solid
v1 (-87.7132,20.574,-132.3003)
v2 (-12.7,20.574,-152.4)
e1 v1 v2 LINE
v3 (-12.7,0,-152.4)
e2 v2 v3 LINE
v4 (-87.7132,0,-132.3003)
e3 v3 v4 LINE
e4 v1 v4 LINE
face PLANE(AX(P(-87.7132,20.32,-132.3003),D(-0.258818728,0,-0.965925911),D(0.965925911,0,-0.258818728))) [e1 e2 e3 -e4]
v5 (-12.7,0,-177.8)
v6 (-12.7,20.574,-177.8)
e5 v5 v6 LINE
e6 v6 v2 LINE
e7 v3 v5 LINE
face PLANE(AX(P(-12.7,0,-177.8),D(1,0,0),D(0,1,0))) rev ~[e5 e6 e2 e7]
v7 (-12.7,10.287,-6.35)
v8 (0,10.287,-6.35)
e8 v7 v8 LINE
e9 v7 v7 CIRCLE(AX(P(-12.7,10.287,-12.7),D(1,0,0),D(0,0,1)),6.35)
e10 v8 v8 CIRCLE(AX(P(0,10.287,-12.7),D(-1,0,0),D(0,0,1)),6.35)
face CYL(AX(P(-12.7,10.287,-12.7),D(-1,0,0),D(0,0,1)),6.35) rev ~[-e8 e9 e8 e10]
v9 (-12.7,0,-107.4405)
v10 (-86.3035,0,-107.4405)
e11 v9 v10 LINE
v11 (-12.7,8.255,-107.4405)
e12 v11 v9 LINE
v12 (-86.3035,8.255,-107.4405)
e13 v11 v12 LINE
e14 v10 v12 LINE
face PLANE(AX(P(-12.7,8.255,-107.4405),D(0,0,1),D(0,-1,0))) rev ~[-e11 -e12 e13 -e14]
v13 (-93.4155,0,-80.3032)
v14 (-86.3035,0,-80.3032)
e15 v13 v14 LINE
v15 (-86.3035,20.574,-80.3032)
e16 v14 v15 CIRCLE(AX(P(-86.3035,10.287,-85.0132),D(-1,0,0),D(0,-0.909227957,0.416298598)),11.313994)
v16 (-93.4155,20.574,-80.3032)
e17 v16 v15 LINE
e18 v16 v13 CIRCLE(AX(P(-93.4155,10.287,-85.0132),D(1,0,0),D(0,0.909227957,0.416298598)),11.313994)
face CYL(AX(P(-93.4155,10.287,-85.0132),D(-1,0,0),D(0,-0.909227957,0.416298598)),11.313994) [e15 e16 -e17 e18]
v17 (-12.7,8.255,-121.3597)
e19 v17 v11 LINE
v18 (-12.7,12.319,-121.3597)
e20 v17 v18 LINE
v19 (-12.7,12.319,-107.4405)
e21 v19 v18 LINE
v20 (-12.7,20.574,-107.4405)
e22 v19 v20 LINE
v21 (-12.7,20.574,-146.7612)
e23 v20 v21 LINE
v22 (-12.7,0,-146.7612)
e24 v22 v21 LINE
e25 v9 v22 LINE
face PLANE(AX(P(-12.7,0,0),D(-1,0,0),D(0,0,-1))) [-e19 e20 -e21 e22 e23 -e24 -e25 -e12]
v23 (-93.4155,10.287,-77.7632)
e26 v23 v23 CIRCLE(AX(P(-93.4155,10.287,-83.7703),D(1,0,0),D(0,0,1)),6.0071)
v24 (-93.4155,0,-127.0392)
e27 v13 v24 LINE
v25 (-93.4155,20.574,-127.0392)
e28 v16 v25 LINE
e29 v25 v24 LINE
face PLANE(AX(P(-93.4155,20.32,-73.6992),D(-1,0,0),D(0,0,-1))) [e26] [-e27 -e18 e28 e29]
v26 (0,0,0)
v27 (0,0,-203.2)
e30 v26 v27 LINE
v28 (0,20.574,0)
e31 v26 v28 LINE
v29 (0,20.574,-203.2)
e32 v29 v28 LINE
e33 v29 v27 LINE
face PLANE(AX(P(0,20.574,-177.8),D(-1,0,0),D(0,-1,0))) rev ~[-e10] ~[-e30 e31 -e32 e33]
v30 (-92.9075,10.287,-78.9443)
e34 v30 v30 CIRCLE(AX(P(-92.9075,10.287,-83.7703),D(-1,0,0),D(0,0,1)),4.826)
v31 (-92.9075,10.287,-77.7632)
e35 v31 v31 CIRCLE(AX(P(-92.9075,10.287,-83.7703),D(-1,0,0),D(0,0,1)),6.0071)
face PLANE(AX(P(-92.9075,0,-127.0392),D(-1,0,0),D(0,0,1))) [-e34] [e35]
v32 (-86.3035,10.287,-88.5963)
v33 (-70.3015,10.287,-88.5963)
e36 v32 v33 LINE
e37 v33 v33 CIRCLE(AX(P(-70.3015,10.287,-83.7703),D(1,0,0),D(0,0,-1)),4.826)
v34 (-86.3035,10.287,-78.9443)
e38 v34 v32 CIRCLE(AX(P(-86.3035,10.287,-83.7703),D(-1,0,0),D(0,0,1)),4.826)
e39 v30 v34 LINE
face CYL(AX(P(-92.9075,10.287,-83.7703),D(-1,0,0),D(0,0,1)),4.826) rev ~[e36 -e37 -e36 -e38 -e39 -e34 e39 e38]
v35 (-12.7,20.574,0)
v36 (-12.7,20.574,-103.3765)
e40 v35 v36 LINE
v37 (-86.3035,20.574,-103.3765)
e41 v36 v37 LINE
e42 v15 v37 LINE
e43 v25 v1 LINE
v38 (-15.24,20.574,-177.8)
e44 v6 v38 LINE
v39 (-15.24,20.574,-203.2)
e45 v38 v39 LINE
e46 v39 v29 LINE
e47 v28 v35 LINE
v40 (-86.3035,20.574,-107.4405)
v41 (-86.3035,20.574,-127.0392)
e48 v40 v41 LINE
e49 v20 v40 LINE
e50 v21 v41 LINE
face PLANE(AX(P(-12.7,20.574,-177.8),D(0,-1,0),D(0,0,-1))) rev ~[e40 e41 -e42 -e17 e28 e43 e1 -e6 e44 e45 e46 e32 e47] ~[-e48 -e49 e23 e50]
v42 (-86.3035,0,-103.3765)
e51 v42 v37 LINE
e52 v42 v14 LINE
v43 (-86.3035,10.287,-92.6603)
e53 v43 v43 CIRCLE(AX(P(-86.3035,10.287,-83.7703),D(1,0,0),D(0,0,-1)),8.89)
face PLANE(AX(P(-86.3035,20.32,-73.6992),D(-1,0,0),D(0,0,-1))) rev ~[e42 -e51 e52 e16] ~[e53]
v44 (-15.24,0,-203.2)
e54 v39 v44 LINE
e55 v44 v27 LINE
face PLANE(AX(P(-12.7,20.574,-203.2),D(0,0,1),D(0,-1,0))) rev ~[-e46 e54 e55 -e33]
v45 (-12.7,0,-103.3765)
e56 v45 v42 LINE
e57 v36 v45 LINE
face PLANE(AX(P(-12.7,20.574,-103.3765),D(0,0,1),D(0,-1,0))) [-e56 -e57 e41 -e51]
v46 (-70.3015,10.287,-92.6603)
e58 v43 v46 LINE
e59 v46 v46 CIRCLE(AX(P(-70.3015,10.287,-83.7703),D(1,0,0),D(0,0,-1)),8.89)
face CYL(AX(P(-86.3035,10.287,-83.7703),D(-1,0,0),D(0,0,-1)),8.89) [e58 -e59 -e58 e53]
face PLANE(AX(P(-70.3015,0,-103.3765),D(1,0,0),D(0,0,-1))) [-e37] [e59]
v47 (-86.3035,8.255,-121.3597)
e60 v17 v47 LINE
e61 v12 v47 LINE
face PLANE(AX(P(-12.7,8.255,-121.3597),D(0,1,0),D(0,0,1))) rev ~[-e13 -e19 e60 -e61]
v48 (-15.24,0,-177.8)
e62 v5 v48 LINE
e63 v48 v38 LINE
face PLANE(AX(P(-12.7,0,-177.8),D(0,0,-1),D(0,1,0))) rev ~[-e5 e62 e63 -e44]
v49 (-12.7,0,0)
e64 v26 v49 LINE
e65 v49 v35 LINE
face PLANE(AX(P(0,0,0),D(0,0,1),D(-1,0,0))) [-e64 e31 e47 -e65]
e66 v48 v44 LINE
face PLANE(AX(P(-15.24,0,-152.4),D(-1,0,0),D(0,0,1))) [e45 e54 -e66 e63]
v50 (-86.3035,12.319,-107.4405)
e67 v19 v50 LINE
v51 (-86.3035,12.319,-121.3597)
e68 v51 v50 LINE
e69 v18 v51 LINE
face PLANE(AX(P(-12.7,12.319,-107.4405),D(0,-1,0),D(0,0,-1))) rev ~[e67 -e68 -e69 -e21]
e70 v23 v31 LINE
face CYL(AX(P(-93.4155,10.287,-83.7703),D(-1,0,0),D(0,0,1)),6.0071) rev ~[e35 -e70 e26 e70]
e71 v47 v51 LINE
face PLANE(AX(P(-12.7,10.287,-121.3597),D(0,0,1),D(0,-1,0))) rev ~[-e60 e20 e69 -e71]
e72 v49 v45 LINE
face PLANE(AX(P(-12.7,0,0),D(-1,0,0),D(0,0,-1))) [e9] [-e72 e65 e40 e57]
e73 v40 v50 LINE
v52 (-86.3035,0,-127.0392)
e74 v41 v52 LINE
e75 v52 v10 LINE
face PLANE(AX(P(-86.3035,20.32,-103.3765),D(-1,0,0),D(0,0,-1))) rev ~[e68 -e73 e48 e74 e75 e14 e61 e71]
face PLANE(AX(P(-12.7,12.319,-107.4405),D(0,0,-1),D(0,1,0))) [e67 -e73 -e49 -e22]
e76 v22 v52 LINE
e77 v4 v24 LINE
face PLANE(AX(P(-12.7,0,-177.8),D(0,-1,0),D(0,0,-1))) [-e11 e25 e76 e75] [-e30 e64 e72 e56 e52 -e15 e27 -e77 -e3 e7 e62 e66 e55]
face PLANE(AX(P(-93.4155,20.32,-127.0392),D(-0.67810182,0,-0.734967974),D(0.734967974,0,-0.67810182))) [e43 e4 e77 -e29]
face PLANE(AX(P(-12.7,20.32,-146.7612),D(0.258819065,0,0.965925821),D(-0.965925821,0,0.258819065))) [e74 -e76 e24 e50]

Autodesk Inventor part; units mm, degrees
ref_plane "YZ Plane" through (0, 0, 0) normal (1, 0, 0) x (0, 1, 0)
ref_plane "XZ Plane" through (0, 0, 0) normal (0, 1, 0) x (-1, 0, 0)
ref_plane "XY Plane" through (0, 0, 0) normal (0, 0, 1) x (1, 0, 0)
sketch "Sketch1" plane through (0, 0, 0) normal (0, 1, 0) x (-1, 0, 0)
  line L0 (0, 0) -> (12.7, 0)
  line L1 (12.7, 0) -> (12.7, -177.8)
  line L2 (12.7, -177.8) -> (0, -177.8)
  line L3 (0, -177.8) -> (0, 0)
  dimension "d0" = 12.7
  dimension "d1" = 177.8
extrude "Extrusion1" add sketch "Sketch1" along normal blind 20.574
sketch "Sketch4" plane through (0, 0, 0) normal (0, -1, 0) x (1, 0, 0)
  line L0 (0, -177.8) -> (-12.7, -177.8) projected
  line L1 (-12.7, -177.8) -> (0, -177.8)
  line L2 (0, -177.8) -> (0, -146.7612)
  line L3 (0, -146.7612) -> (-12.7, -146.7612)
  line L4 (-12.7, -146.7612) -> (-12.7, -177.8)
  line L5 (-12.7, -146.7612) -> (-86.3035, -127.0392)
  line L6 (-12.7, -146.7612) -> (63.5, -146.7612) construction
  line L7 (-86.3035, -127.0392) -> (-86.3035, -73.6992)
  line L8 (-86.3035, -73.6992) -> (-93.4155, -73.6992)
  line L9 (-93.4155, -73.6992) -> (-93.4155, -127.0392)
  line L10 (-12.7, -177.8) -> (0, -177.8)
  line L11 (0, -177.8) -> (0, -152.4)
  line L12 (0, -152.4) -> (-12.7, -152.4)
  line L13 (-12.7, -152.4) -> (-12.7, -177.8)
  line L14 (-12.7, -152.4) -> (-87.7132, -132.3003)
  line L15 (-87.7132, -132.3003) -> (-93.4155, -127.0392)
  point P0 (0, 0)
  dimension "d6" = 12.7
  dimension "d7" = 31.0388
  dimension "d8" = 76.2
  dimension "d9" = 165
  dimension "d10" = 53.34
  dimension "d11" = 7.112
  dimension "d12" = 12.7
  dimension "d13" = 25.4
sketch "Sketch5" plane through (-12.7, 0, -177.8) normal (-1, 0, 0) x (0, 0, 1)
  line L0 (177.8, 20.574) -> (0, 20.574) projected
  line L1 (0, 0) -> (177.8, 0) projected
  line L2 (0, 20.574) -> (31.0403, 20.574)
  line L3 (31.0403, 20.574) -> (31.0403, 0)
  line L4 (31.0403, 0) -> (0, 0)
  line L5 (0, 0) -> (0, 20.574)
  line L6 (31.0403, 10.287) -> (56.4403, 10.287)
  line L7 (56.4403, 10.287) -> (56.4403, 12.319)
  line L8 (56.4403, 12.319) -> (56.4403, 8.255)
  line L9 (56.4403, 8.255) -> (70.3595, 8.255)
  line L10 (70.3595, 8.255) -> (70.3595, 12.319)
  line L11 (70.3595, 12.319) -> (56.4403, 12.319)
  line L12 (70.3595, 12.319) -> (70.3595, 20.574)
  line L13 (70.3595, 8.255) -> (70.3595, 0)
  line L14 (70.3595, 20.574) -> (74.4235, 20.574)
  line L15 (74.4235, 20.574) -> (74.4235, 0)
  line L16 (70.3595, 0) -> (74.4235, 0)
  dimension "d14" = 25.4
  dimension "d15" = 2.032
  dimension "d16" = 4.064
  dimension "d17" = 13.9192
  dimension "d18" = 4.064
extrude "Extrusion2" add sketch "Sketch5" along normal blind 73.66 contours L15 L1 L13 L10 L12 L0 | L10 L9 L8 L7 L11
extrude "Extrusion3" add sketch "Sketch4" against normal blind 20.32 contours L14 L15 L9 L8 L7 L5 L4
sketch "Sketch6" plane through (-12.7, 0, 0) normal (-1, 0, 0) x (0, 0, 1)
  line L0 (0, 0) -> (0, 20.574) projected
  line L1 (0, 10.287) -> (-6.35, 10.287)
  line L2 (-6.35, 10.287) -> (-19.05, 10.287)
  circle A0 centre (-12.7, 10.287) radius 6.35
  dimension "d24" = 12.7
  dimension "d25" = 12.7
extrude "Extrusion4" cut sketch "Sketch6" against normal blind 20.32
sketch "Sketch7" plane through (0, 20.32, 0) normal (0, 1, 0) x (1, 0, 0)
  line L0 (-86.3035, 73.6992) -> (-86.3035, 103.3765) projected
  line L1 (-93.4155, 73.6992) -> (-86.3035, 73.6992) projected
  line L2 (-86.3035, 73.6992) -> (-93.4155, 73.6992)
  line L3 (-93.4155, 73.6992) -> (-93.4155, 127.0392) projected
  line L4 (-93.4155, 73.6992) -> (-93.4155, 127.0392)
  line L5 (-93.4155, 127.0392) -> (-87.7132, 132.3003) projected
  line L6 (-93.4155, 127.0392) -> (-87.7132, 132.3003)
  line L7 (-12.7, 146.7612) -> (-86.3035, 127.0392) projected
  line L8 (-86.3035, 73.6992) -> (-86.3035, 127.0392)
  line L9 (-86.3035, 127.0392) -> (-12.7, 146.7612)
  line L10 (-12.7, 177.8) -> (-12.7, 107.4405) projected
  line L11 (-12.7, 146.7612) -> (-12.7, 152.4)
  line L12 (-87.7132, 132.3003) -> (-12.7, 152.4) projected
  line L13 (-12.7, 152.4) -> (-87.7132, 132.3003)
  point P0 (0, 0)
  dimension "d30" = 76.2
  dimension "d31" = 5.6388
extrude "Extrusion5" add sketch "Sketch7" along normal blind 0.254
sketch "Sketch8" plane through (-93.4155, 0, -127.0392) normal (-1, 0, 0) x (0, 0, 1)
  line L0 (53.34, 0) -> (53.34, 20.574) projected
  line L1 (53.34, 20.574) -> (46.736, 20.574)
  line L2 (0, 20.574) -> (53.34, 20.574) projected
  line L3 (46.736, 20.574) -> (46.736, 0)
  line L4 (53.34, 0) -> (0, 0) projected
  arc A0 (46.736, 0) -> (46.736, 20.574) centre (42.026, 10.287) ccw
  point P0 (127.0392, 0)
  dimension "d34" = 6.604
extrude "Extrusion6" cut sketch "Sketch8" against normal blind 25.4 contours L4 A0 L0 | A0 L1 L0
sketch "Sketch9" plane through (-93.4155, 0, -127.0392) normal (-1, 0, 0) x (0, 0, 1)
  arc A0 (46.736, 0) -> (46.736, 20.574) centre (42.026, 10.287) ccw projected
  line L0 (53.34, 10.287) -> (49.276, 10.287)
  line L1 (49.276, 10.287) -> (37.2618, 10.287)
  circle A1 centre (43.2689, 10.287) radius 6.0071
  point P0 (127.0392, 0)
  dimension "d37" = 4.064
  dimension "d38" = 12.0142
extrude "Extrusion7" cut sketch "Sketch9" against normal blind 0.508
sketch "Sketch11" plane through (-92.9075, 10.287, -83.7703) normal (-1, 0, 0) x (0, 0, 1)
  circle A0 centre (0, 0) radius 4.826
  point P0 (83.7703, -10.287)
  dimension "d41" = 9.652
extrude "Extrusion8" cut sketch "Sketch11" against normal blind 22.86
sketch "Sketch12" plane through (-86.3035, 0, -103.3765) normal (1, 0, 0) x (0, 0, -1)
  circle A0 centre (-19.6062, 10.287) radius 6.0071 projected
  circle A1 centre (-19.6062, 10.287) radius 8.89
  point P0 (-103.3765, 0)
  dimension "d44" = 17.78
extrude "Extrusion9" add sketch "Sketch12" along normal blind 16.002
sketch "Sketch13" plane through (-86.3035, 10.287, -83.7703) normal (1, 0, 0) x (0, 0, -1)
  circle A0 centre (0, 0) radius 4.826 projected
  circle A1 centre (0, 0) radius 4.826
  circle A2 centre (0, 0) radius 6.0071
  point P0 (-83.7703, -10.287)
extrude "Extrusion10" add sketch "Sketch13" along normal blind 16.002
sketch "Sketch21" plane through (0, 0, -177.8) normal (0, 0, -1) x (-1, 0, 0)
  line L0 (0, 0) -> (12.7, 0)
  line L1 (12.7, 0) -> (12.7, 20.574)
  line L2 (12.7, 20.574) -> (0, 20.574)
  line L3 (0, 20.574) -> (0, 0)
extrude "Extrusion14" add sketch "Sketch21" along normal blind 25.4
sketch "Sketch22" plane through (-12.7, 0, -152.4) normal (-1, 0, 0) x (0, 0, 1)
  line L0 (0, 0) -> (-50.8, 0) projected
  line L1 (0, 20.574) -> (-50.8, 20.574) projected
  line L2 (-50.8, 0) -> (-25.4, 0)
  line L3 (-25.4, 0) -> (-25.4, 20.574)
  line L4 (-25.4, 20.574) -> (-50.8, 20.574)
  line L5 (-50.8, 20.574) -> (-50.8, 0)
  point P0 (152.4, 0)
extrude "Extrusion15" add sketch "Sketch22" along normal blind 2.54
properties part number "steeringBracket" material "Steel, Carbon"
